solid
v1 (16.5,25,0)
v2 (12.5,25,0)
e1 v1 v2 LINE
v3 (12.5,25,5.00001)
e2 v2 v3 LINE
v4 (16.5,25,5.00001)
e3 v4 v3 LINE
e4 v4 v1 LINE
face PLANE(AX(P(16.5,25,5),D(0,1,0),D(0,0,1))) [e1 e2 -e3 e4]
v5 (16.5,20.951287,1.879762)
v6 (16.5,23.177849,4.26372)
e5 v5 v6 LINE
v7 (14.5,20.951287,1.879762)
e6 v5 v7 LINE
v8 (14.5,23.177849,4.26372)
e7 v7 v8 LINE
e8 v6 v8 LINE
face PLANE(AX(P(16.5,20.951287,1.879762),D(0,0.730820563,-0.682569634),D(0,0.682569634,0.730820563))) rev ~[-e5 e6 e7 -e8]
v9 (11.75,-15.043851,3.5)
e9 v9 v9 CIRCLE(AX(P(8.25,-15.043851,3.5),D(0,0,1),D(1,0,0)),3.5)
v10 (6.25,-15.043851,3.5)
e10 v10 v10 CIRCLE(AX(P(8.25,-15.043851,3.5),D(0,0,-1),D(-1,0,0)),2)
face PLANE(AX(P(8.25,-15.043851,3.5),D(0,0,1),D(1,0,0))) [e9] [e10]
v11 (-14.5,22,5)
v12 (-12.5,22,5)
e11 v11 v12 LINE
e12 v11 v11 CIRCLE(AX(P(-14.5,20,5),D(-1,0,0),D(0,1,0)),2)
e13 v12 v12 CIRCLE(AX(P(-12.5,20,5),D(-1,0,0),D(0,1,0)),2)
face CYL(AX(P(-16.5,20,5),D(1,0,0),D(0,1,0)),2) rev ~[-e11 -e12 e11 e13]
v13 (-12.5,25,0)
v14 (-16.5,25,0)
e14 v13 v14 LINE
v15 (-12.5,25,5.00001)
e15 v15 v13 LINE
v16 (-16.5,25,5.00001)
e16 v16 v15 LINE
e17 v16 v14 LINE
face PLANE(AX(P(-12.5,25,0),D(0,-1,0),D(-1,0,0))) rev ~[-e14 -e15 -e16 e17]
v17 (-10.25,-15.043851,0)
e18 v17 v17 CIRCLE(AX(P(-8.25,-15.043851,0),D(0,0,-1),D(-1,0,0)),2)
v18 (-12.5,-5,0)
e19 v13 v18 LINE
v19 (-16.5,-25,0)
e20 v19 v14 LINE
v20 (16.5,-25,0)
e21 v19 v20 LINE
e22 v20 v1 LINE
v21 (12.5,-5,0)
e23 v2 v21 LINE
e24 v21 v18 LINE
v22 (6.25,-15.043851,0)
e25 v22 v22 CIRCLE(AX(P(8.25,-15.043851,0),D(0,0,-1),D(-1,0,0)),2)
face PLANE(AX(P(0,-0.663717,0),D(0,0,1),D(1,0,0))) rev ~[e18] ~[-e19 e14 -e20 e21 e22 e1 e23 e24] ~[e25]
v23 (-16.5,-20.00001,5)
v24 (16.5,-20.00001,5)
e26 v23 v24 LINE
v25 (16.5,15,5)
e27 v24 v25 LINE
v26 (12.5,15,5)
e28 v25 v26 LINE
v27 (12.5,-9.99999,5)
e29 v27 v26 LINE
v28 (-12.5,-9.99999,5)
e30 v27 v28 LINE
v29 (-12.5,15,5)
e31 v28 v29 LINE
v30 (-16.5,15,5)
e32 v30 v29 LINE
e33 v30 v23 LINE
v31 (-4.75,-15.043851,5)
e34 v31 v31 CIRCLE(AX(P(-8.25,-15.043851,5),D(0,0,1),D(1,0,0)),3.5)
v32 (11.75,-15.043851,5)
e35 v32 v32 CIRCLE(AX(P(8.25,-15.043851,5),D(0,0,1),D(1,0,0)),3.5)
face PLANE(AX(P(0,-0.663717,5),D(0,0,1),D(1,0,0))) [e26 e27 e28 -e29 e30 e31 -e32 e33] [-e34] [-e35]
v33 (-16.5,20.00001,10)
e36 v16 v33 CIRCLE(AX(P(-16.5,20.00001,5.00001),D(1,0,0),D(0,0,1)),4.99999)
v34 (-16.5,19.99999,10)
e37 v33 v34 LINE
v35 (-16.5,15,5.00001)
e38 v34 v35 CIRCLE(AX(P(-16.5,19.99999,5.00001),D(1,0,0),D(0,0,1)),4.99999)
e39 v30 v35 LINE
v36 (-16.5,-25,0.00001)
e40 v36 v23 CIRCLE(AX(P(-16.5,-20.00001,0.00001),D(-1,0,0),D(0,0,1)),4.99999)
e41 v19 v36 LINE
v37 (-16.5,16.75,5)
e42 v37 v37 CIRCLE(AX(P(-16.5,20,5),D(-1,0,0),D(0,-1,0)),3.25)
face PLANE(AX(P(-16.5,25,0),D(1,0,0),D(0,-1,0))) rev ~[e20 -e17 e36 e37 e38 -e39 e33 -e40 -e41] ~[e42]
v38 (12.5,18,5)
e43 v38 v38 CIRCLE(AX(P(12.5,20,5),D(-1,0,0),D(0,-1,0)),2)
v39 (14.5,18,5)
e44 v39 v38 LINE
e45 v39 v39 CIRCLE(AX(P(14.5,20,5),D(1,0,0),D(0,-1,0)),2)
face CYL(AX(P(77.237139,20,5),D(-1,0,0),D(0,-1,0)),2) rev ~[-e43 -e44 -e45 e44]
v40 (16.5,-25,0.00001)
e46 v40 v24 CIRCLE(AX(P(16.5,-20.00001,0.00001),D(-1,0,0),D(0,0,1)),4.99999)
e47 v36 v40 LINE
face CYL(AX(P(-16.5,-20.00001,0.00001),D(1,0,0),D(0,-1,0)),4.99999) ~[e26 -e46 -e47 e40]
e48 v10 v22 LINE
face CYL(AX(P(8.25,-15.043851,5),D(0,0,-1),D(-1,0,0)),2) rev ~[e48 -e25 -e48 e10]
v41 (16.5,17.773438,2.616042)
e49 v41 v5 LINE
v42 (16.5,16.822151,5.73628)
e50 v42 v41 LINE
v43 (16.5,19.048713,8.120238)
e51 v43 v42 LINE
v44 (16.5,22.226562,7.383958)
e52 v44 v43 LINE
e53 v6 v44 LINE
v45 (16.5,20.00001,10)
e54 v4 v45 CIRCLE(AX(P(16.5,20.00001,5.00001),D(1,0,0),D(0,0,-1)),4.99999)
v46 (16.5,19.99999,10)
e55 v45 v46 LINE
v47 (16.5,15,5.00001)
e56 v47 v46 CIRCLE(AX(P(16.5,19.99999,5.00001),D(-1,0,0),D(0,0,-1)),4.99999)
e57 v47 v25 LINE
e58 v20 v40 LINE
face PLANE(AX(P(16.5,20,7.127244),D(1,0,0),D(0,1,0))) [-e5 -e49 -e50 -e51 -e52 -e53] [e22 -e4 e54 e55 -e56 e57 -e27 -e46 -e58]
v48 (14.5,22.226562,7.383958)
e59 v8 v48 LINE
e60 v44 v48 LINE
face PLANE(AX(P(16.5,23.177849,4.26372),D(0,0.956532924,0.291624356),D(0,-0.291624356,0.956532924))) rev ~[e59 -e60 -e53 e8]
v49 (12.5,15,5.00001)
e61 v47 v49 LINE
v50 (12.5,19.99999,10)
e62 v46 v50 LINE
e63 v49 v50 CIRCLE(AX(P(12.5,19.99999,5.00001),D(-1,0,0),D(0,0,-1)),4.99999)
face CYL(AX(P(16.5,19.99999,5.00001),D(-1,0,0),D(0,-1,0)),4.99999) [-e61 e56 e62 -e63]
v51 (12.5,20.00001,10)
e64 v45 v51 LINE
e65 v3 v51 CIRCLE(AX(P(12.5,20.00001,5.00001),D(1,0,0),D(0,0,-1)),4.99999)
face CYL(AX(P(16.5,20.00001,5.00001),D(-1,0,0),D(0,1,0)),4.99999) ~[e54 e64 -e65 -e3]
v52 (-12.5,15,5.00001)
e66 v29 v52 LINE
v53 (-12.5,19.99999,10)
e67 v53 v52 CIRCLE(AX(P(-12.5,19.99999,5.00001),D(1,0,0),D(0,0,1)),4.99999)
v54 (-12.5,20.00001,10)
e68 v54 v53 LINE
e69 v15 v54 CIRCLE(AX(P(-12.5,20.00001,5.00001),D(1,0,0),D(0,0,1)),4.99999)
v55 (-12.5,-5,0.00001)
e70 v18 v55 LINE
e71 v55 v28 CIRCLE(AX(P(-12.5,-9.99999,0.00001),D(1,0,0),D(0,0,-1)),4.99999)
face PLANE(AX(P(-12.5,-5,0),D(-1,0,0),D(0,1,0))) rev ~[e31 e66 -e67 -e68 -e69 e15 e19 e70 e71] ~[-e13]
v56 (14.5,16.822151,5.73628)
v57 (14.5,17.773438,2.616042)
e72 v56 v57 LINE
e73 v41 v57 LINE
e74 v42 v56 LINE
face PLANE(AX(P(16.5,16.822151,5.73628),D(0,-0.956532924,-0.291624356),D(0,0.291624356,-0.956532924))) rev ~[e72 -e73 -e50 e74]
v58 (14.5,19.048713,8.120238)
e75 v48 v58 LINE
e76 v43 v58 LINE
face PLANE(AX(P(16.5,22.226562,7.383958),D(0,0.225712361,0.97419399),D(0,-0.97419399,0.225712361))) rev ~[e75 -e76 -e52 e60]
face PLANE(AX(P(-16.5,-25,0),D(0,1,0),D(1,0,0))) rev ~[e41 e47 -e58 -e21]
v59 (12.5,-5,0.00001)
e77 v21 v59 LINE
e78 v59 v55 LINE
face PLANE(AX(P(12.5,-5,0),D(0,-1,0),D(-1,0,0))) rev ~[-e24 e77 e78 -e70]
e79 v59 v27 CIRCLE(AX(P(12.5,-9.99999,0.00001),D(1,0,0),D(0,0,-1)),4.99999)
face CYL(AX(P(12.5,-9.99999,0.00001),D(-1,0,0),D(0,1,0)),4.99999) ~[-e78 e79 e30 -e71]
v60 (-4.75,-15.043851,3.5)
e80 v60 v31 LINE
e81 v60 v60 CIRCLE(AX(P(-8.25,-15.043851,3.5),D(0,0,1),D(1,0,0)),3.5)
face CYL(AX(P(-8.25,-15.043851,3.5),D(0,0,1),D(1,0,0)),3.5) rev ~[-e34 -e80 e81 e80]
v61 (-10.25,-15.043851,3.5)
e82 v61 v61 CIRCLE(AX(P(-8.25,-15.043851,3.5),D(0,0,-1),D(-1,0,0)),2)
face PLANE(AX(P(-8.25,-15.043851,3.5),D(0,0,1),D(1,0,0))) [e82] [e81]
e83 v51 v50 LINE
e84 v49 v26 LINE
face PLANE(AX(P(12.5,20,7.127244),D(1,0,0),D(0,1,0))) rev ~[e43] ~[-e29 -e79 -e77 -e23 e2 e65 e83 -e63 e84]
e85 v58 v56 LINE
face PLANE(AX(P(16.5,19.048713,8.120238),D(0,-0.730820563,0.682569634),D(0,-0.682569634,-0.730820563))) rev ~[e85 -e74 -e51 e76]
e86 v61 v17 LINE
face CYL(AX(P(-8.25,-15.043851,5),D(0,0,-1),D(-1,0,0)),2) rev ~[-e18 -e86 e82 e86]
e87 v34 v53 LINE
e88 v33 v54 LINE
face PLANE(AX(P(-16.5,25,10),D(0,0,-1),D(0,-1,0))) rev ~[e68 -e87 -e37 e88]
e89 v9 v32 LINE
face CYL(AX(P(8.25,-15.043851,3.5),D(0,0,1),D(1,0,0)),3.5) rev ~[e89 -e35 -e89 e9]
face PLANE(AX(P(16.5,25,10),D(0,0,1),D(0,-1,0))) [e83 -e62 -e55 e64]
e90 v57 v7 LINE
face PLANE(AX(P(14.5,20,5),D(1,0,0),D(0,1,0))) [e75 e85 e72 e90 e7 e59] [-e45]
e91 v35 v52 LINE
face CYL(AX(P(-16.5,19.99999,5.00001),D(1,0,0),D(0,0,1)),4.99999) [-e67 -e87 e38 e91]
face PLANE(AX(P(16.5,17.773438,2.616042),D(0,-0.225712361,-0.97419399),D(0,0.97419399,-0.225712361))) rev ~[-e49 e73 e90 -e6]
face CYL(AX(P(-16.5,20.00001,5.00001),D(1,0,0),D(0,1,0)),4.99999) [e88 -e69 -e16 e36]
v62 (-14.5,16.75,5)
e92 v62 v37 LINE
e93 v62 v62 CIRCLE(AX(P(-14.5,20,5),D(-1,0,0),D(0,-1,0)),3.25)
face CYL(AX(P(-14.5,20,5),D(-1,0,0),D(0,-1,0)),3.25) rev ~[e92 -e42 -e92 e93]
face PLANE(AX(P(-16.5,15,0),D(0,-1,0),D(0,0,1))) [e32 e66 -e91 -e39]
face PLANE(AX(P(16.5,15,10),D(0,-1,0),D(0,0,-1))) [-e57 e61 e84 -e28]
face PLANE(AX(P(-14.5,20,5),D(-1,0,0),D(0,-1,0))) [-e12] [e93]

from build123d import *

# Parameters (mm, degrees)
F1_DEPTH        = 5
F2_W            = 10
F2_H            = 10
F3_DEPTH        = 4
F5_D            = 4
F5_CBORE_D      = 6.5
F5_CBORE_DEPTH  = 2
F7_DEPTH        = 4
F9_D            = 4
F10_R           = 2
F11_DEPTH       = 2
F12_R           = 4.99999
F14_D           = 4
F14_CBORE_D     = 7
F14_CBORE_DEPTH = 1.5


# Not quite as in the source:
# - a fillet or chamfer is up to 0.001 mm smaller than in the source, because OpenCascade refuses the exact size


with BuildPart() as f1:
    # F0 (on Top) → F1 (new body)
    with BuildSketch(Plane.XY):
        Polygon((16.5, -25), (16.5, 25), (12.5, 25), (12.5, -5), (-12.5, -5), (-12.5, 25), (-16.5, 25), (-16.5, -25), align=None)
    extrude(amount=F1_DEPTH)

    # F2 (on face) → F3 (join)
    with BuildSketch(Plane(origin=(-16.5, 0, 0), x_dir=(0, -1, 0), z_dir=(-1, 0, 0))):
        with Locations((-20, 5)):
            Rectangle(F2_W, F2_H)
    extrude(amount=-F3_DEPTH)

    # F5 (through all)
    with Locations(Plane(origin=(-16.5, 0, 0), x_dir=(0, -1, 0), z_dir=(-1, 0, 0))):
        with Locations((-20, 5)):
            CounterBoreHole(F5_D / 2, F5_CBORE_D / 2, F5_CBORE_DEPTH)

    # F6 (on face) → F7 (join)
    with BuildSketch(Plane.YZ.offset(16.5)):
        with BuildLine():
            Line((22, 5), (25, 5))
            Line((25, 5), (25, 10))
            Line((25, 10), (15, 10))
            Line((15, 10), (15, 5))
            Line((15, 5), (18, 5))
            ThreePointArc((18, 5), (20, 3), (22, 5))
        make_face()
    extrude(amount=-F7_DEPTH)

    # F9 (through all)
    with Locations(Plane.YZ.offset(16.5)):
        with Locations((20, 5)):
            Hole(F9_D / 2)

    # F10 (on face) → F11 (cut)
    with BuildSketch(Plane.YZ.offset(16.5)):
        Polygon((20.9512871128, 1.8797618421), (23.1778490671, 4.263719727), (22.2265619542, 7.383957885), (19.0487128872, 8.1202381579), (16.8221509329, 5.736280273), (17.7734380458, 2.616042115), align=None)
        with Locations((20, 5)):
            Circle(F10_R, mode=Mode.SUBTRACT)
    extrude(amount=-F11_DEPTH, mode=Mode.SUBTRACT)

    # F12 (radius 5 in the source; OpenCascade refuses exactly that, so slightly less here)
    f12_edges = [f1.edges().sort_by_distance(p)[0] for p in [
        (14.5, 25, 10),
        (14.5, 15, 10),
        (-14.5, 15, 10),
        (-14.5, 25, 10),
        (0, -25, 5),
        (0, -5, 5),
    ]]
    fillet(f12_edges, radius=F12_R)

    # F14 (through all)
    with Locations(Plane.XY.offset(5)):
        with Locations((-8.25, -15.0438509881), (8.25, -15.0438509881)):
            CounterBoreHole(F14_D / 2, F14_CBORE_D / 2, F14_CBORE_DEPTH)


solid = f1.part
